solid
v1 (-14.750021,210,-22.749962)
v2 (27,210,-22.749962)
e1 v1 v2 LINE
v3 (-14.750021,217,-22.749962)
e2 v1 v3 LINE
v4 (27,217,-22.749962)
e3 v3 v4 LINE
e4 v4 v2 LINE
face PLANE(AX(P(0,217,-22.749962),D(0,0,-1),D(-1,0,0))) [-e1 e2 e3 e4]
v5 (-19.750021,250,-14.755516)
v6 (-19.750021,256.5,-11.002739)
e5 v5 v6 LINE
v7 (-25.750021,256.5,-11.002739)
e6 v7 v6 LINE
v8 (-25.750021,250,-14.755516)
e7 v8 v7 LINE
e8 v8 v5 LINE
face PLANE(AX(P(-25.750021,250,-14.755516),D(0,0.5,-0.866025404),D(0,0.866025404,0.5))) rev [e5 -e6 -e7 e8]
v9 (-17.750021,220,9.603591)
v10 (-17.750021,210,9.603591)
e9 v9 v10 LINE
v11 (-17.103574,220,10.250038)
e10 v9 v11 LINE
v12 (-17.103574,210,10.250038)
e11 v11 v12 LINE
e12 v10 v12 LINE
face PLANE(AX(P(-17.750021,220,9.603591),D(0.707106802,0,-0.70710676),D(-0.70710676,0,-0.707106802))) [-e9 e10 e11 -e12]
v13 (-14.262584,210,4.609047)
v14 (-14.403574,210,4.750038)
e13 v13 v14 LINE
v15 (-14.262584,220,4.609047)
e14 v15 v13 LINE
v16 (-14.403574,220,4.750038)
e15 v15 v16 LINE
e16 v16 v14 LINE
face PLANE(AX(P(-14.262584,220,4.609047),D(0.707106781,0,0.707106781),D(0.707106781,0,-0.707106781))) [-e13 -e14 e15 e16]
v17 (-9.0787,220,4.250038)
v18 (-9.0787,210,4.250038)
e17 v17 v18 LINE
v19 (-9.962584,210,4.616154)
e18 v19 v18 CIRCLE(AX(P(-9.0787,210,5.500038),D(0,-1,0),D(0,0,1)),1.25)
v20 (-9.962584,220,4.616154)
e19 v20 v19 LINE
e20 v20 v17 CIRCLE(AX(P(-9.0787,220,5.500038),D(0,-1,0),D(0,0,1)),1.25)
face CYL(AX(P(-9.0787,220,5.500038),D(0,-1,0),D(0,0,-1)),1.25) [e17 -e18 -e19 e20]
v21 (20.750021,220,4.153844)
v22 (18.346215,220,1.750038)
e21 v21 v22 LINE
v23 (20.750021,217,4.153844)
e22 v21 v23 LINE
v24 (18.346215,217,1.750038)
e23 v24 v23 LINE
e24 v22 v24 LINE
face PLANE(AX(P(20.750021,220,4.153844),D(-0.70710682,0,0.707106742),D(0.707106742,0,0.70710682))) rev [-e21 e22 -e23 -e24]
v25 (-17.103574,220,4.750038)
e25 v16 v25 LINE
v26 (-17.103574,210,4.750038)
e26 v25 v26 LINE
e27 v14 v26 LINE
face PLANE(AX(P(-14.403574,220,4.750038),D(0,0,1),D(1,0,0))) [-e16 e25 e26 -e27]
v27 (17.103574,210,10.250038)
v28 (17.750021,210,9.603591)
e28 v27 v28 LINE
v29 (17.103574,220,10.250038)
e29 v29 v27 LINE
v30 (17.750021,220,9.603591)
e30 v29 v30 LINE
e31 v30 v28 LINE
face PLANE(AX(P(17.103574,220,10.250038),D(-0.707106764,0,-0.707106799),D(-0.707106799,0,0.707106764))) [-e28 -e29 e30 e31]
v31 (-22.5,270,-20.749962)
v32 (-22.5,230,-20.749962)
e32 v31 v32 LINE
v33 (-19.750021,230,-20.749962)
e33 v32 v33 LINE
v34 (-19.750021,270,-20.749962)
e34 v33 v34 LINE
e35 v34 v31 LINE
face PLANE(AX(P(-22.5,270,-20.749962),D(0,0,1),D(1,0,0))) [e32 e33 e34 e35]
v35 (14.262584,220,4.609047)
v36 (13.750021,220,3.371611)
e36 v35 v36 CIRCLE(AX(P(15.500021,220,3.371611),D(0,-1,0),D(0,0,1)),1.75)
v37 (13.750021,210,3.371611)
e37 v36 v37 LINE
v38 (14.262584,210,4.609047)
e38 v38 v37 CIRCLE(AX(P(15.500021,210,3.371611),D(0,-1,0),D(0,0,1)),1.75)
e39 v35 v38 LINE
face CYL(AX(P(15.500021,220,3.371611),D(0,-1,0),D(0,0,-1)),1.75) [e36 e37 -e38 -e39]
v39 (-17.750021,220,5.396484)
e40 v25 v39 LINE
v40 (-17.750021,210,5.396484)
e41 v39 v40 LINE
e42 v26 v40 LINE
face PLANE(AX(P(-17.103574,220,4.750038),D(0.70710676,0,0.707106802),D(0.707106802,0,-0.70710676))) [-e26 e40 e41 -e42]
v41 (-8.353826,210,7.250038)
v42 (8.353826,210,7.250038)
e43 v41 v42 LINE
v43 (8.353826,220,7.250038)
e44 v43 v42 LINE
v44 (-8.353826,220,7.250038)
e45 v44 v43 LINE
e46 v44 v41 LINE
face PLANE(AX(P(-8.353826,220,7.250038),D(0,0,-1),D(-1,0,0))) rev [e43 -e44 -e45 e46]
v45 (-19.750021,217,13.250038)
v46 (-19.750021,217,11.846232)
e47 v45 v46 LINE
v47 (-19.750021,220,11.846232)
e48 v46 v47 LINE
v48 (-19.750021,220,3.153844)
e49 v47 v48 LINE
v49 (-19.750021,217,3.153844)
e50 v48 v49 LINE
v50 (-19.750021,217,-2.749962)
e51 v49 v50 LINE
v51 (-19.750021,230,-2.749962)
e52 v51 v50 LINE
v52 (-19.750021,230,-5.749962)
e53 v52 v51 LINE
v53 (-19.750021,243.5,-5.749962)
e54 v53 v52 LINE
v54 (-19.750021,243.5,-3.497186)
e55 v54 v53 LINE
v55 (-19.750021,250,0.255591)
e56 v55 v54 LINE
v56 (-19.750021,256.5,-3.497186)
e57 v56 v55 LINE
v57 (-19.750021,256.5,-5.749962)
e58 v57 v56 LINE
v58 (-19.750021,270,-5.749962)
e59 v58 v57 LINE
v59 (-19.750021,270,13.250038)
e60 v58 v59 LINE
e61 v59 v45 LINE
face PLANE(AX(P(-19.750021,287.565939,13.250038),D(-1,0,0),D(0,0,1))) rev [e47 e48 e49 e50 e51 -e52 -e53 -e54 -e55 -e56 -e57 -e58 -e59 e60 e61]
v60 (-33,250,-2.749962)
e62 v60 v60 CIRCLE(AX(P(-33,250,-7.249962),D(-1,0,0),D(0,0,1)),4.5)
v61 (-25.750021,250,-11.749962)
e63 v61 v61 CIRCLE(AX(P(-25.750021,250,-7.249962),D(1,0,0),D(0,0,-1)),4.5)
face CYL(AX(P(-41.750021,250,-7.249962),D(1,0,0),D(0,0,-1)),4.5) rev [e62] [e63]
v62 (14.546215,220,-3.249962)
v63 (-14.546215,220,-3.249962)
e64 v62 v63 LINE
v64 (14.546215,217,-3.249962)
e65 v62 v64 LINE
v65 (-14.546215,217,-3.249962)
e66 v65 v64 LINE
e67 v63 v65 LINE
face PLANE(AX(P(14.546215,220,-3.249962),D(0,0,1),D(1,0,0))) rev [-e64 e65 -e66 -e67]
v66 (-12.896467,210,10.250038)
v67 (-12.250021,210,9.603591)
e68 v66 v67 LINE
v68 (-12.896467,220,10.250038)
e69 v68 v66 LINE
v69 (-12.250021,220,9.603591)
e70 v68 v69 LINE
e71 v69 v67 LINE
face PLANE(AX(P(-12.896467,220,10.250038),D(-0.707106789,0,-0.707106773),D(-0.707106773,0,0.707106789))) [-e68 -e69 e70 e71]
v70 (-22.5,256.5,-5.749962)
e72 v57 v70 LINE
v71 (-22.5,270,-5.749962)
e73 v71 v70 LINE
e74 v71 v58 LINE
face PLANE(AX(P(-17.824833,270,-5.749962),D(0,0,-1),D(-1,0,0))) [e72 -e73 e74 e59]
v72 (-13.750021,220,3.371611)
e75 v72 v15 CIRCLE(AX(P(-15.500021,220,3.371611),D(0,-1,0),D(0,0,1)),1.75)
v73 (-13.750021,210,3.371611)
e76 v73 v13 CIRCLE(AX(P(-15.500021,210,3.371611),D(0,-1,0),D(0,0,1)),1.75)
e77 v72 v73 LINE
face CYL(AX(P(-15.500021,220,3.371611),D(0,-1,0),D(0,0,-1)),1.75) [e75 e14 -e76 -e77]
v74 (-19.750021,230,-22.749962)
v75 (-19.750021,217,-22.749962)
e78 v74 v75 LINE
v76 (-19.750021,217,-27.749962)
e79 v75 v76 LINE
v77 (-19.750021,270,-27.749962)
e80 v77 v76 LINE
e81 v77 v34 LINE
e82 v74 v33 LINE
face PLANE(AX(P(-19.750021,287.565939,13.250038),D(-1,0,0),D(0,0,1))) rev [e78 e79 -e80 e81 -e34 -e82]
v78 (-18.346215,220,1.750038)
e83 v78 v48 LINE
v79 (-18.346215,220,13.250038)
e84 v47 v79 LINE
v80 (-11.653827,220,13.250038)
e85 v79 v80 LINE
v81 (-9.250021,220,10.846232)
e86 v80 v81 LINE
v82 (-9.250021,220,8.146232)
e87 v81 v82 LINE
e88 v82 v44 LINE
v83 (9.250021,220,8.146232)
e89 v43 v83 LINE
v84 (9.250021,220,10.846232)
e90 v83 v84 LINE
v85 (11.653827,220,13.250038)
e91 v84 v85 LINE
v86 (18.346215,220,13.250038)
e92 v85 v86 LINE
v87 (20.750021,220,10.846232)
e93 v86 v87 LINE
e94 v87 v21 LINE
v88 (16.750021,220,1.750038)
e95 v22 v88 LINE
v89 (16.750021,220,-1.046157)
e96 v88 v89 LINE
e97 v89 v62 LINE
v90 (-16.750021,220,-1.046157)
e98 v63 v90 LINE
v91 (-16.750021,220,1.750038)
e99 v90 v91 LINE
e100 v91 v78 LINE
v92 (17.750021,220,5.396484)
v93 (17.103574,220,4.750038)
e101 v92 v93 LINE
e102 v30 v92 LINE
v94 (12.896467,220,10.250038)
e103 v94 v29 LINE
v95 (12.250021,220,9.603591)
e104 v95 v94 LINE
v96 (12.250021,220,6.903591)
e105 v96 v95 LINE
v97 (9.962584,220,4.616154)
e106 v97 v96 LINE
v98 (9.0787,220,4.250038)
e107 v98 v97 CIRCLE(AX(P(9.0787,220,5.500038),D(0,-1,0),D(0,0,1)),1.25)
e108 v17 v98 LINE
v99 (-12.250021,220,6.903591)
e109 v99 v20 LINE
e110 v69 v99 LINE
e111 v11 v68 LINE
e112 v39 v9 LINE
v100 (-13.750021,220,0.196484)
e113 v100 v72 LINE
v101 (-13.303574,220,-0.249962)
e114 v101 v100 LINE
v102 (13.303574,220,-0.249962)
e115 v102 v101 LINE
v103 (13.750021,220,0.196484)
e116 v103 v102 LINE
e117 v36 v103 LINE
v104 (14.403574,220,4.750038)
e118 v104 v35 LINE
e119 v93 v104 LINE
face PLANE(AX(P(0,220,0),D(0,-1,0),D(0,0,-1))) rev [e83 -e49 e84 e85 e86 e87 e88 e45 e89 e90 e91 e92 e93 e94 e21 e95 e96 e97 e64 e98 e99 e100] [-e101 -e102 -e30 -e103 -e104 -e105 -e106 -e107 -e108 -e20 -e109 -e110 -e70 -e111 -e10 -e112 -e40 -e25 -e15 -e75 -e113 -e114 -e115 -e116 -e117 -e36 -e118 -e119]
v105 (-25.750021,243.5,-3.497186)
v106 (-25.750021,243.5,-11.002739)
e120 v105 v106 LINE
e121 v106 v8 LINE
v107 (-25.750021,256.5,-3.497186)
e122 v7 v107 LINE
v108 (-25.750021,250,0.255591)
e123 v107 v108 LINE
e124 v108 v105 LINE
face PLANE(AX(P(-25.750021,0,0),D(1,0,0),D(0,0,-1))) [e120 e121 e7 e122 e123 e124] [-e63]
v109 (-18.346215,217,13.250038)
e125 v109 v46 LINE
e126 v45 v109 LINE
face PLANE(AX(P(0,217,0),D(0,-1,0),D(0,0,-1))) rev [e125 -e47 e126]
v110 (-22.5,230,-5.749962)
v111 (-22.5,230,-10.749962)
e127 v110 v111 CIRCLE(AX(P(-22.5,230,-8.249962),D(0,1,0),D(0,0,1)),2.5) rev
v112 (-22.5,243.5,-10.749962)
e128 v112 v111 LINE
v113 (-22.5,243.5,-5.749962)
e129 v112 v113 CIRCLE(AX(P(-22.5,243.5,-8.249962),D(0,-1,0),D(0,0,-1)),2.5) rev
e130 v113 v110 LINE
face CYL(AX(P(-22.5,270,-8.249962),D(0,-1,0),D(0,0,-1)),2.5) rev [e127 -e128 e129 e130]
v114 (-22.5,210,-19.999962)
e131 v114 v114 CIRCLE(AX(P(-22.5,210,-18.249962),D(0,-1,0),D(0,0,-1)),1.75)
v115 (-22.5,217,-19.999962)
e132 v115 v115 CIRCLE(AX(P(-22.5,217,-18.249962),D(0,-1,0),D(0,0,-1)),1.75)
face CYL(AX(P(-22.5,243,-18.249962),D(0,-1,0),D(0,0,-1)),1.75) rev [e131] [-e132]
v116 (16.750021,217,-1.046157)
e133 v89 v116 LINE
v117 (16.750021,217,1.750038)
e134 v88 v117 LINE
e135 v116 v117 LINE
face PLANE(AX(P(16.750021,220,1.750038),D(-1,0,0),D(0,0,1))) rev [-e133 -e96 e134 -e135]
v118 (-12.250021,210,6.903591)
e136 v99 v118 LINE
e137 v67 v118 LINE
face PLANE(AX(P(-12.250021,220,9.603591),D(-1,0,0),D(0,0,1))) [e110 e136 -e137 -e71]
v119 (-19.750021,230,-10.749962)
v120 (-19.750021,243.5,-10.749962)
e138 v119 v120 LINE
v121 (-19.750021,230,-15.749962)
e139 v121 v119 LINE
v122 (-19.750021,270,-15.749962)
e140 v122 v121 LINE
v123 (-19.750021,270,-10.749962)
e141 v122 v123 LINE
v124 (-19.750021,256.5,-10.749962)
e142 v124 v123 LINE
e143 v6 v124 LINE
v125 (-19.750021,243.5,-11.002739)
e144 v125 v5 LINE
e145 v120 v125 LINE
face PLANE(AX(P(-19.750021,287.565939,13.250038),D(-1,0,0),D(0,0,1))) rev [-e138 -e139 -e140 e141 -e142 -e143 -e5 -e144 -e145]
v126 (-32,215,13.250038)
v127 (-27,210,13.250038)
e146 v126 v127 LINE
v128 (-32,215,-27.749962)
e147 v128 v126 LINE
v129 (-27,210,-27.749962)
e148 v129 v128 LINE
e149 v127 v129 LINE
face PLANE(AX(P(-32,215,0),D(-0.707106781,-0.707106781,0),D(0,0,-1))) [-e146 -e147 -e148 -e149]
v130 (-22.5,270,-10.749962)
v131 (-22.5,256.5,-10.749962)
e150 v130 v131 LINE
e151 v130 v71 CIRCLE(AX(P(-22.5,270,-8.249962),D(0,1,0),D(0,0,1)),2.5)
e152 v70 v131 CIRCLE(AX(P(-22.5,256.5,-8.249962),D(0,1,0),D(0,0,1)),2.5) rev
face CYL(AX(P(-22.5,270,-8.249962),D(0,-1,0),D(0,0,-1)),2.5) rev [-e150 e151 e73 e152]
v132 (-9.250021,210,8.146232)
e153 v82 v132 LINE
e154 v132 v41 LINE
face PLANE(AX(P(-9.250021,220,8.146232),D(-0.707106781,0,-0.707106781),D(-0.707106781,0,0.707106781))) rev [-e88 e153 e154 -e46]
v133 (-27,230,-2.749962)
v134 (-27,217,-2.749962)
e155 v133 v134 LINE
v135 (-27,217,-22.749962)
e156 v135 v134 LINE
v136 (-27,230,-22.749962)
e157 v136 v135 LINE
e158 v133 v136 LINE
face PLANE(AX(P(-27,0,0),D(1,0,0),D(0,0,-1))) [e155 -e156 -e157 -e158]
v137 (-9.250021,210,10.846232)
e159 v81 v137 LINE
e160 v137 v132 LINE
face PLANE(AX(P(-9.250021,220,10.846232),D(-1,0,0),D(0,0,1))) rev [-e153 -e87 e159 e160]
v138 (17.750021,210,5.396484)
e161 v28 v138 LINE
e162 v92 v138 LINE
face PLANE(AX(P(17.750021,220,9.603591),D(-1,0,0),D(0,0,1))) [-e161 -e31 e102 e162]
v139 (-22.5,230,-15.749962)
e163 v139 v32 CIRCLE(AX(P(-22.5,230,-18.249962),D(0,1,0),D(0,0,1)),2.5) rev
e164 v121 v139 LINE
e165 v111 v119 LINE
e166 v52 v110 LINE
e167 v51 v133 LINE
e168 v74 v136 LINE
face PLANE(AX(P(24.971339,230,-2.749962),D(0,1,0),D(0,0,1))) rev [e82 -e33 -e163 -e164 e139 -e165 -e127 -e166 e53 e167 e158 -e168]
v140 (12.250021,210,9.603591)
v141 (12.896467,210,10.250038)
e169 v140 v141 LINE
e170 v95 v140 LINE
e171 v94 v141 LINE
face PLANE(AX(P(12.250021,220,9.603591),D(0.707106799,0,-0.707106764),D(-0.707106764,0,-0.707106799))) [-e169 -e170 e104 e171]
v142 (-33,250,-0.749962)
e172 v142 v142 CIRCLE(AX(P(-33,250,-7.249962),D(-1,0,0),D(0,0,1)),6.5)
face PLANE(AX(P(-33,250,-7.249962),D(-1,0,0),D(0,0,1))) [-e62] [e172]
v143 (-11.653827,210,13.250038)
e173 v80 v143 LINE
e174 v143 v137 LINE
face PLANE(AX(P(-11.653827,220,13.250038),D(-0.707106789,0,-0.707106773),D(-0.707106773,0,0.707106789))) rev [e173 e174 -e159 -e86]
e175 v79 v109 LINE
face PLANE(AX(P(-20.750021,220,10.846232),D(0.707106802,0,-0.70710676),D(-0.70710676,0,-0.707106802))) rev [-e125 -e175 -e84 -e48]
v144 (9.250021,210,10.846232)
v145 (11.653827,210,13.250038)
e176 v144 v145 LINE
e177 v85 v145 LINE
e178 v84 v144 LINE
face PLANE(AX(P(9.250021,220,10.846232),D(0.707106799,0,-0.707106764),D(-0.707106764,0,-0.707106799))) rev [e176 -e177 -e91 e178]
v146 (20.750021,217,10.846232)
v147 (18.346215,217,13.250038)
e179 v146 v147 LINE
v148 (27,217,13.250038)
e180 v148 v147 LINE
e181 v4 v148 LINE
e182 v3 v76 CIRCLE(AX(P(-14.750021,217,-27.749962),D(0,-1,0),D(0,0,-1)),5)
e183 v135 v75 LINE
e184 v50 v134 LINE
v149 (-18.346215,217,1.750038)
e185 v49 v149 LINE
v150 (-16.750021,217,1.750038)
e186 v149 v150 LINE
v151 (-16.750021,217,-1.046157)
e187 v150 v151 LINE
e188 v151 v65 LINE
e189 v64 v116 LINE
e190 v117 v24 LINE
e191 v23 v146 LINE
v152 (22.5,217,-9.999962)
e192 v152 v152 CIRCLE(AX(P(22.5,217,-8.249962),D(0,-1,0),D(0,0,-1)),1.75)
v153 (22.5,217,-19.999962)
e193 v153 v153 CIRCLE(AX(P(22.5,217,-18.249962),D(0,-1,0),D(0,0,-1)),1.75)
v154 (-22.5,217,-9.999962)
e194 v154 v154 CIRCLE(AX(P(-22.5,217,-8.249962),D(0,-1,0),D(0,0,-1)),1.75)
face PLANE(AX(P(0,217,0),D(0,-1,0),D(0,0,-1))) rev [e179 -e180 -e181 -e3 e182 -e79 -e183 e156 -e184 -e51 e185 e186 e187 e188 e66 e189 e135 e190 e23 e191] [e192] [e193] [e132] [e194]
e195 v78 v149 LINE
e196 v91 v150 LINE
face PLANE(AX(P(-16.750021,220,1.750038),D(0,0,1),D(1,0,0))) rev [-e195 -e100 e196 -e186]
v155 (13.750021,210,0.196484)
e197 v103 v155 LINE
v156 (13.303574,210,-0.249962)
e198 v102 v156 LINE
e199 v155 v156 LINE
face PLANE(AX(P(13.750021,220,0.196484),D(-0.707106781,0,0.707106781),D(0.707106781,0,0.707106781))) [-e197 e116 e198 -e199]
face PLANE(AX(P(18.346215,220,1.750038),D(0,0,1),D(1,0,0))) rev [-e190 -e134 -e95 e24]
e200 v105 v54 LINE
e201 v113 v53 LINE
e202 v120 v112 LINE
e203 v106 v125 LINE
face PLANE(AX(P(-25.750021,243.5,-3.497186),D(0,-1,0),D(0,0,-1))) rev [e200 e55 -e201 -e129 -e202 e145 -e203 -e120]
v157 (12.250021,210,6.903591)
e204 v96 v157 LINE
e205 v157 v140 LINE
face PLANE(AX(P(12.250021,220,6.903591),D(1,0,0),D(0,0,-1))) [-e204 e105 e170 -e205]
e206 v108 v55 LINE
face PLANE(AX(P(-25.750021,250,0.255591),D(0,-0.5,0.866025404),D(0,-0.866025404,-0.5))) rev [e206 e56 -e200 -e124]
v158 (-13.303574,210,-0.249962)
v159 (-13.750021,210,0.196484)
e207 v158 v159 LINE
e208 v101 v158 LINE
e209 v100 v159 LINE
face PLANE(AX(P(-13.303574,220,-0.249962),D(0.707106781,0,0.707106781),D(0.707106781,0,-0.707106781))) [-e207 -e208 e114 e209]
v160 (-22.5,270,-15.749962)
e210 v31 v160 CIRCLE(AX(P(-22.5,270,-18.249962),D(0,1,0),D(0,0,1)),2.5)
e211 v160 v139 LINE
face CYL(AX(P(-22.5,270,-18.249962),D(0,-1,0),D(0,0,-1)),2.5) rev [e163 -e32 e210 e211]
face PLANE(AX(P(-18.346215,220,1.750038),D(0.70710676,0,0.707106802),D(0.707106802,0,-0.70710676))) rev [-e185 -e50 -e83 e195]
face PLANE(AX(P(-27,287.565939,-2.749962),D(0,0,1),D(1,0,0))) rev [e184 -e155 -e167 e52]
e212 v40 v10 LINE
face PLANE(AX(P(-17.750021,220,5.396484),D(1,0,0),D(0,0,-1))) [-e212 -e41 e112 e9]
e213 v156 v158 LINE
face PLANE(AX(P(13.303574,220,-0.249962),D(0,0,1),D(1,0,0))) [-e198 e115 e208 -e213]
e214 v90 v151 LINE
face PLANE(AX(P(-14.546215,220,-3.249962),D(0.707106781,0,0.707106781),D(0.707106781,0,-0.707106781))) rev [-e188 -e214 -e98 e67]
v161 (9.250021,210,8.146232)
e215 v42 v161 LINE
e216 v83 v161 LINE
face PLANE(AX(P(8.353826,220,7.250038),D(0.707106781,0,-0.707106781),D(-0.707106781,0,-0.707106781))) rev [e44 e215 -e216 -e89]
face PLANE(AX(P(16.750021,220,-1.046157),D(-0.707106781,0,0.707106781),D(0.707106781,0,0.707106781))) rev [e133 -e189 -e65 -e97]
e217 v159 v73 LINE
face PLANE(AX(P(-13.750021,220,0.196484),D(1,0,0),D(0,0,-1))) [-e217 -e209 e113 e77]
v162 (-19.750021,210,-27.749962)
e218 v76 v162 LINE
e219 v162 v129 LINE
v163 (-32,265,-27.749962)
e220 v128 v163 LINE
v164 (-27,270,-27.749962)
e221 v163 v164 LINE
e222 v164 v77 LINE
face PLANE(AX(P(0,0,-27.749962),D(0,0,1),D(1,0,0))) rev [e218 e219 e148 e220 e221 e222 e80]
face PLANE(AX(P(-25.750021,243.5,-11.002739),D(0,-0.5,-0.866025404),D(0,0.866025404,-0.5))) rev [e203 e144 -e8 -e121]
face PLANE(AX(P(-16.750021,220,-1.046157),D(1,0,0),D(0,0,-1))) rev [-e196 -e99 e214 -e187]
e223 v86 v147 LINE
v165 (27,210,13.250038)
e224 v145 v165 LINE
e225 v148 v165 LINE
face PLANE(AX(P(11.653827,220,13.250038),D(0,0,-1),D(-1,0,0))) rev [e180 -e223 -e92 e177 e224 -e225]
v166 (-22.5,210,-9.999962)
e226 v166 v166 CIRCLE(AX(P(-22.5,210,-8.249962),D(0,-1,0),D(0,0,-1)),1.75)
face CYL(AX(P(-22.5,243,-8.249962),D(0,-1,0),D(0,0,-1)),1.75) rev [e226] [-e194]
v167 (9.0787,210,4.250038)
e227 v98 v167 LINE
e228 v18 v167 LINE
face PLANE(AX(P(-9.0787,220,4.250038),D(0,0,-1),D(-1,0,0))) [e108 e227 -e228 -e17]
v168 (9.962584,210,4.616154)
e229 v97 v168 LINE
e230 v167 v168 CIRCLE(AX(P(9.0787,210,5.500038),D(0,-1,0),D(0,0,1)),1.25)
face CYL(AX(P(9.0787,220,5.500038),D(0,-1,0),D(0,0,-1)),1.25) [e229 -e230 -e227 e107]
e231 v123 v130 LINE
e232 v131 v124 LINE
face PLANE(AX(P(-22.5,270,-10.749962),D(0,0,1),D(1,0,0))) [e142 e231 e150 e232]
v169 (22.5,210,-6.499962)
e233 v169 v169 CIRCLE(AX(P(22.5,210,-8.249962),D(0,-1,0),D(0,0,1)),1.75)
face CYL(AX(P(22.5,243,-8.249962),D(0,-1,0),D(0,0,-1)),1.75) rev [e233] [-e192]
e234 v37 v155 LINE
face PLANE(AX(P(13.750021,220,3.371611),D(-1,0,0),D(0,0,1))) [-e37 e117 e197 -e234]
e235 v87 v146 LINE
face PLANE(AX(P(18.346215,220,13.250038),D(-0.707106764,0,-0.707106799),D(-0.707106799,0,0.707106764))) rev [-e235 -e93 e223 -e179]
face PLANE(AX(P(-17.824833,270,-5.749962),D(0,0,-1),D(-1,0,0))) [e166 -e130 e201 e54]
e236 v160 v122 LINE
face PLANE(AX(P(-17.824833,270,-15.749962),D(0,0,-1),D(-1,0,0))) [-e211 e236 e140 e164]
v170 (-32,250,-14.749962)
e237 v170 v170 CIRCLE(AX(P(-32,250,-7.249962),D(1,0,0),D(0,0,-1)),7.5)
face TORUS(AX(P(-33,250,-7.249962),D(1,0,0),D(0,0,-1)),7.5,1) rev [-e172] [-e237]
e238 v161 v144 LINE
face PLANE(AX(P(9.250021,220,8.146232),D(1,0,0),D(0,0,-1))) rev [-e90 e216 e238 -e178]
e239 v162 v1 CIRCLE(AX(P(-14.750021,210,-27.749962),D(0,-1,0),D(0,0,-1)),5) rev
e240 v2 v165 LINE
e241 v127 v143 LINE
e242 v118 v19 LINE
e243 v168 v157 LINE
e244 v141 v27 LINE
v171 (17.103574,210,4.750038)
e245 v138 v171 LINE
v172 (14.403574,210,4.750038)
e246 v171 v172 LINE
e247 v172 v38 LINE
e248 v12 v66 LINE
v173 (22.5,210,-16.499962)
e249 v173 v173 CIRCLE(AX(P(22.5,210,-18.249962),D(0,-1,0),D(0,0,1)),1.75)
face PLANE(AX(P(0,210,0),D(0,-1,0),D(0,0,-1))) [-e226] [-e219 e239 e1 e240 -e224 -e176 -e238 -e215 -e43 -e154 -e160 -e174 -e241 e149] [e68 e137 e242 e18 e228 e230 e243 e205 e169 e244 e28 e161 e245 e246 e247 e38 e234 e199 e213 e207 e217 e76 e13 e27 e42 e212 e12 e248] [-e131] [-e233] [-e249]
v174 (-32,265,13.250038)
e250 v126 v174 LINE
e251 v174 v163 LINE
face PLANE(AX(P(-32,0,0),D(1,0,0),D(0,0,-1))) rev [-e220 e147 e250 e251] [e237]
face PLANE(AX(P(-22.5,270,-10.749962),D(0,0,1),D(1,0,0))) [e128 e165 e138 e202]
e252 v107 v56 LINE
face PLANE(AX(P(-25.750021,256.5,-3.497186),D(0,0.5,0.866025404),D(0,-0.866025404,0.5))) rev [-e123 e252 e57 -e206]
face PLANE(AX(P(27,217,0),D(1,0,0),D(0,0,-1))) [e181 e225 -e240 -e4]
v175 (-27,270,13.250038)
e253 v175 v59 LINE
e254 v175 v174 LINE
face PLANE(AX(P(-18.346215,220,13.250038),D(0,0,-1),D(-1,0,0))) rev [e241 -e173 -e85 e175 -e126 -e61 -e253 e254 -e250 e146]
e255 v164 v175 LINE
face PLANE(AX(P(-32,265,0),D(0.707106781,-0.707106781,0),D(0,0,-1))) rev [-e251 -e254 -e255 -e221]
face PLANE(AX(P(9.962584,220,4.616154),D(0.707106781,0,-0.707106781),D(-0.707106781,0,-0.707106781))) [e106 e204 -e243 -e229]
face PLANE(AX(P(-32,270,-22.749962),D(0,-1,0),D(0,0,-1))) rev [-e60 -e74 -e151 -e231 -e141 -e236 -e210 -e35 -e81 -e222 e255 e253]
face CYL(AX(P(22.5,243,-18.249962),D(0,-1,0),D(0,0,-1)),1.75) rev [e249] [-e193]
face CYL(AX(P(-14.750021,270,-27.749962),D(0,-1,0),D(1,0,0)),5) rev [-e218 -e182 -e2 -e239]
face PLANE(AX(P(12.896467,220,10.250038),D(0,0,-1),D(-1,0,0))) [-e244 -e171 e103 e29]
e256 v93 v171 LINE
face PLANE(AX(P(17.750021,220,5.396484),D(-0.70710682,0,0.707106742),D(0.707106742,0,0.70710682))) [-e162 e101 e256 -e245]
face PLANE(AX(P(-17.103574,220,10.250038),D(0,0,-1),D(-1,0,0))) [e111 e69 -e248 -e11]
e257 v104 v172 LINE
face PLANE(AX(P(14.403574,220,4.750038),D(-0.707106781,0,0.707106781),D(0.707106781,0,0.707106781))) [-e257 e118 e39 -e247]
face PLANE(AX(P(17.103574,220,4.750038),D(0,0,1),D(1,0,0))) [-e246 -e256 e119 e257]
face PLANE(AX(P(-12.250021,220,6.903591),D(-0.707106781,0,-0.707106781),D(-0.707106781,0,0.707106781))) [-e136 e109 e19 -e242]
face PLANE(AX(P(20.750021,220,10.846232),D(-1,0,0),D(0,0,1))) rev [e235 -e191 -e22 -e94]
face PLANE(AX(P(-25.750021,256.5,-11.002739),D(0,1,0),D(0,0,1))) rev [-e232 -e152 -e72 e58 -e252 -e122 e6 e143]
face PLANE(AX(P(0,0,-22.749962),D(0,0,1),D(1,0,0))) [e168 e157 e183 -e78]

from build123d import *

# Parameters (mm, degrees)
BOSS_EXTRUDE1_DEPTH = 400
BOSS_EXTRUDE2_DEPTH = 10
SKETCH3_R           = 43.000999871
CUT_EXTRUDE1_DEPTH  = 447.360216168
BOSS_EXTRUDE3_DEPTH = 7
SKETCH5_R           = 1.75
CUT_EXTRUDE2_DEPTH  = 33
SKETCH6_W           = 36.000000185
SKETCH6_H           = 60
BOSS_EXTRUDE4_DEPTH = 5
SKETCH7_W           = 7.24997928
SKETCH7_H           = 16
BOSS_EXTRUDE5_DEPTH = 53
SKETCH8_W           = 12.24997928
SKETCH8_H           = 60
BOSS_EXTRUDE6_DEPTH = 5
FILLET1_R           = 5
SKETCH10_W          = 20.000000185
SKETCH10_H          = 40
BOSS_EXTRUDE7_DEPTH = 7.24997928
CUT_EXTRUDE3_DEPTH  = 6
CUT_EXTRUDE4_DEPTH  = 68.845857758
SKETCH12_R          = 4.5
CUT_EXTRUDE5_DEPTH  = 16
CHAMFER2_SIZE       = 5
CHAMFER3_SIZE       = 5
SKETCH13_R          = 6.5
SKETCH13_R_2        = 4.5
BOSS_EXTRUDE8_DEPTH = 1
FILLET2_R           = 1


with BuildPart() as part:
    # Sketch1 → Boss-Extrude1 (new body)
    with BuildSketch(Plane(origin=(0, 200, 0), x_dir=(1, 0, 0), z_dir=(0, 1, 0))):
        with BuildLine():
            Line((1e-09, -3.855700002), (0.25, -4.00003757))
            Line((0.25, -4.00003757), (9.078700232, -4.00003757))
            ThreePointArc((9.078700232, -4.00003757), (9.652725366, -4.114218268), (10.139360377, -4.439377387))
            Line((10.139360377, -4.439377387), (12.500020747, -6.800037757))
            Line((12.500020747, -6.800037757), (12.500020747, -9.500037757))
            Line((12.500020747, -9.500037757), (13.00002072, -10.000037755))
            Line((13.00002072, -10.000037755), (17.00002072, -10.000037755))
            Line((17.00002072, -10.000037755), (17.500020747, -9.500037752))
            Line((17.500020747, -9.500037752), (17.500020747, -5.500037752))
            Line((17.500020747, -5.500037752), (17.00002075, -5.0000377))
            Line((17.00002075, -5.0000377), (14.30002072, -5.0000377))
            Line((14.30002072, -5.0000377), (14.085807141, -4.785824121))
            ThreePointArc((14.085807141, -4.785824121), (13.652261651, -4.136977442), (13.50002072, -3.371610598))
            Line((13.50002072, -3.371610598), (13.50002072, -0.30003757))
            Line((13.50002072, -0.30003757), (13.20002072, -3.757e-05))
            Line((13.20002072, -3.757e-05), (7.50002072, -3.757e-05))
            Line((7.50002072, -3.757e-05), (7.40002072, -0.10003757))
            Line((7.40002072, -0.10003757), (-7.40002072, -0.10003757))
            Line((-7.40002072, -0.10003757), (-7.50002072, -3.757e-05))
            Line((-7.50002072, -3.757e-05), (-13.20002072, -3.757e-05))
            Line((-13.20002072, -3.757e-05), (-13.50002072, -0.30003757))
            Line((-13.50002072, -0.30003757), (-13.50002072, -3.371610628))
            ThreePointArc((-13.50002072, -3.371610628), (-13.652261651, -4.136977472), (-14.085807141, -4.785824151))
            Line((-14.085807141, -4.785824151), (-14.30002069, -5.0000377))
            Line((-14.30002069, -5.0000377), (-17.00002072, -5.0000377))
            Line((-17.00002072, -5.0000377), (-17.50002072, -5.50003767))
            Line((-17.50002072, -5.50003767), (-17.50002072, -9.50003767))
            Line((-17.50002072, -9.50003767), (-17.000020665, -10.000037755))
            Line((-17.000020665, -10.000037755), (-13.00002072, -10.000037755))
            Line((-13.00002072, -10.000037755), (-12.500020741, -9.500037764))
            Line((-12.500020741, -9.500037764), (-12.500020741, -6.800037764))
            Line((-12.500020741, -6.800037764), (-10.139360364, -4.439377387))
            ThreePointArc((-10.139360364, -4.439377387), (-9.652725352, -4.114218268), (-9.078700218, -4.00003757))
            Line((-9.078700218, -4.00003757), (-0.25, -4.00003757))
            Line((-0.25, -4.00003757), (1e-09, -3.855700002))
        make_face()
    extrude(amount=-BOSS_EXTRUDE1_DEPTH)

    # Sketch3 → Cut-Extrude1 (cut)
    with BuildSketch(Plane(origin=(0, 200, 0), x_dir=(1, 0, 0), z_dir=(0, 1, 0))):
        with Locations((0, -0.10003757)):
            Circle(SKETCH3_R)
    extrude(amount=-CUT_EXTRUDE1_DEPTH, mode=Mode.SUBTRACT)


with BuildPart() as body_2:
    # Sketch2 → Boss-Extrude2 (new body)
    with BuildSketch(Plane(origin=(0, 210, 0), x_dir=(1, 0, 0), z_dir=(0, 1, 0))):
        Polygon((-8.353826469, -7.25003757), (8.353826482, -7.25003757), (9.250020747, -8.146231835), (9.250020747, -10.846231788), (11.653826595, -13.250037755), (18.34621475, -13.250037755), (20.750020747, -10.846231878), (20.750020747, -4.153843779), (18.346214932, -1.7500377), (16.75002072, -1.7500377), (16.75002072, 1.046156508), (14.546214798, 3.24996243), (-14.546214798, 3.24996243), (-16.75002072, 1.046156508), (-16.75002072, -1.7500377), (-18.346214741, -1.7500377), (-20.75002072, -4.153843535), (-20.75002072, -10.846231691), (-18.3462148, -13.250037755), (-11.653826621, -13.250037755), (-9.250020741, -10.846231821), (-9.250020741, -8.146231842), align=None)
        with BuildLine():
            Line((13.303574111, 0.24996243), (-13.303574111, 0.24996243))
            Line((-13.303574111, 0.24996243), (-13.75002072, -0.196484179))
            Line((-13.75002072, -0.196484179), (-13.75002072, -3.371610628))
            ThreePointArc((-13.75002072, -3.371610628), (-13.883231534, -4.041306614), (-14.262583837, -4.609047456))
            Line((-14.262583837, -4.609047456), (-14.403574081, -4.7500377))
            Line((-14.403574081, -4.7500377), (-17.103574106, -4.7500377))
            Line((-17.103574106, -4.7500377), (-17.75002072, -5.396484275))
            Line((-17.75002072, -5.396484275), (-17.75002072, -9.603591056))
            Line((-17.75002072, -9.603591056), (-17.10357406, -10.250037755))
            Line((-17.10357406, -10.250037755), (-12.896467328, -10.250037755))
            Line((-12.896467328, -10.250037755), (-12.250020741, -9.603591153))
            Line((-12.250020741, -9.603591153), (-12.250020741, -6.903591155))
            Line((-12.250020741, -6.903591155), (-9.962583668, -4.616154083))
            ThreePointArc((-9.962583668, -4.616154083), (-9.557054494, -4.345188152), (-9.078700218, -4.25003757))
            Line((-9.078700218, -4.25003757), (9.078700232, -4.25003757))
            ThreePointArc((9.078700232, -4.25003757), (9.557054508, -4.345188152), (9.962583682, -4.616154083))
            Line((9.962583682, -4.616154083), (12.250020747, -6.903591148))
            Line((12.250020747, -6.903591148), (12.250020747, -9.603591144))
            Line((12.250020747, -9.603591144), (12.896467326, -10.250037755))
            Line((12.896467326, -10.250037755), (17.103574107, -10.250037755))
            Line((17.103574107, -10.250037755), (17.750020747, -9.603591147))
            Line((17.750020747, -9.603591147), (17.750020747, -5.39648437))
            Line((17.750020747, -5.39648437), (17.103574149, -4.7500377))
            Line((17.103574149, -4.7500377), (14.403574111, -4.7500377))
            Line((14.403574111, -4.7500377), (14.262583837, -4.609047426))
            ThreePointArc((14.262583837, -4.609047426), (13.883231534, -4.041306584), (13.75002072, -3.371610598))
            Line((13.75002072, -3.371610598), (13.75002072, -0.196484179))
            Line((13.75002072, -0.196484179), (13.303574111, 0.24996243))
        make_face(mode=Mode.SUBTRACT)
    extrude(amount=BOSS_EXTRUDE2_DEPTH)

    # Sketch4 → Boss-Extrude3 (add)
    with BuildSketch(Plane(origin=(0, 210, 0), x_dir=(-1, 0, 0), z_dir=(0, -1, 0))):
        Polygon((27, -13.250037755), (27, 22.74996243), (-27, 22.74996243), (-27, -13.250037755), (-18.34621475, -13.250037755), (-20.750020747, -10.846231878), (-20.750020747, -4.153843779), (-18.346214932, -1.7500377), (-16.75002072, -1.7500377), (-16.75002072, 1.046156508), (-14.546214798, 3.24996243), (14.546214798, 3.24996243), (16.75002072, 1.046156508), (16.75002072, -1.7500377), (18.346214741, -1.7500377), (20.75002072, -4.153843535), (20.75002072, -10.846231691), (18.3462148, -13.250037755), align=None)
    extrude(amount=-BOSS_EXTRUDE3_DEPTH)

    # Sketch5 → Cut-Extrude2 (cut)
    with BuildSketch(Plane(origin=(0, 210, 0), x_dir=(-1, 0, 0), z_dir=(0, -1, 0))):
        with Locations(Location((22.5, 18.24996243, 0), (0, 0, 90))):
            Circle(SKETCH5_R)
        with Locations(Location((22.5, 8.24996243, 0), (0, 0, 90))):
            Circle(SKETCH5_R)
        with Locations(Location((-22.5, 8.24996243, 0), (0, 0, 90))):
            Circle(SKETCH5_R)
        with Locations(Location((-22.5, 18.24996243, 0), (0, 0, 90))):
            Circle(SKETCH5_R)
    extrude(amount=-CUT_EXTRUDE2_DEPTH, mode=Mode.SUBTRACT)

    # Sketch6 → Boss-Extrude4 (add)
    with BuildSketch(Plane.ZY.offset(27)):
        with Locations((-4.749962337, 240)):
            Rectangle(SKETCH6_W, SKETCH6_H)
    extrude(amount=BOSS_EXTRUDE4_DEPTH)

    # Sketch7 → Boss-Extrude5 (add)
    with BuildSketch(Plane(origin=(0, 217, 0), x_dir=(1, 0, 0), z_dir=(0, 1, 0))):
        with Locations((-23.37501036, -5.250037755)):
            Rectangle(SKETCH7_W, SKETCH7_H)
    extrude(amount=BOSS_EXTRUDE5_DEPTH)

    # Sketch8 → Boss-Extrude6 (add)
    with BuildSketch(Plane(origin=(0, 0, -22.74996243), x_dir=(-1, 0, 0), z_dir=(0, 0, -1))):
        with Locations((25.87501036, 240)):
            Rectangle(SKETCH8_W, SKETCH8_H)
    extrude(amount=BOSS_EXTRUDE6_DEPTH)

    # Fillet1
    fillet1_edges = [body_2.edges().sort_by_distance(p)[0] for p in [
        (-19.75002072, 213.5, -22.74996243),
    ]]
    fillet(fillet1_edges, radius=FILLET1_R - 0.0001)  # a hair under: the kernel refuses the full size

    # Sketch10 → Boss-Extrude7 (add)
    with BuildSketch(Plane(origin=(-27, 0, 0), x_dir=(0, 0, -1), z_dir=(1, 0, 0))):
        with Locations((12.749962337, 250)):
            Rectangle(SKETCH10_W, SKETCH10_H)
    extrude(amount=BOSS_EXTRUDE7_DEPTH)

    # Sketch9 → Cut-Extrude3 (cut)
    with BuildSketch(Plane(origin=(-19.75002072, 0, 0), x_dir=(0, 0, -1), z_dir=(1, 0, 0))):
        Polygon((14.755515837, 250), (11.002739087, 256.5), (3.497185588, 256.5), (-0.255591162, 250), (3.497185588, 243.5), (11.002739087, 243.5), align=None)
    extrude(amount=-CUT_EXTRUDE3_DEPTH, mode=Mode.SUBTRACT)

    # Sketch11 → Cut-Extrude4 (cut, through all)
    with BuildSketch(Plane(origin=(0, 217, 0), x_dir=(1, 0, 0), z_dir=(0, 1, 0))):
        with BuildLine():
            Line((-22.5, 20.74996243), (-17.824832595, 20.74996243))
            Line((-17.824832595, 20.74996243), (-17.824832595, 15.74996243))
            Line((-17.824832595, 15.74996243), (-22.5, 15.74996243))
            ThreePointArc((-22.5, 15.74996243), (-25, 18.24996243), (-22.5, 20.74996243))
        make_face()
        with BuildLine():
            Line((-22.5, 10.74996243), (-17.824832595, 10.74996243))
            Line((-17.824832595, 10.74996243), (-17.824832595, 5.74996243))
            Line((-17.824832595, 5.74996243), (-22.5, 5.74996243))
            ThreePointArc((-22.5, 5.74996243), (-25, 8.24996243), (-22.5, 10.74996243))
        make_face()
    extrude(amount=CUT_EXTRUDE4_DEPTH, mode=Mode.SUBTRACT)

    # Sketch12 → Cut-Extrude5 (cut)
    with BuildSketch(Plane(origin=(-25.75002072, 0, 0), x_dir=(0, 0, -1), z_dir=(1, 0, 0))):
        with Locations((7.249962338, 250)):
            Circle(SKETCH12_R)
    extrude(amount=-CUT_EXTRUDE5_DEPTH, mode=Mode.SUBTRACT)

    # Chamfer2
    chamfer2_edges = [body_2.edges().sort_by_distance(p)[0] for p in [
        (-32, 270, -7.249962337),
    ]]
    chamfer(chamfer2_edges, length=CHAMFER2_SIZE)

    # Chamfer3
    chamfer3_edges = [body_2.edges().sort_by_distance(p)[0] for p in [
        (-32, 210, -7.249962338),
    ]]
    chamfer(chamfer3_edges, length=CHAMFER3_SIZE)

    # Sketch13 → Boss-Extrude8 (add)
    with BuildSketch(Plane.ZY.offset(32)):
        with Locations(Location((-7.249962338, 250, 0), (0, 0, 180))):
            Circle(SKETCH13_R)
        with Locations(Location((-7.249962338, 250, 0), (0, 0, 180))):
            Circle(SKETCH13_R_2, mode=Mode.SUBTRACT)
    extrude(amount=BOSS_EXTRUDE8_DEPTH)

    # Fillet2
    fillet2_edges = [body_2.edges().sort_by_distance(p)[0] for p in [
        (-32, 250, -0.749962338),
    ]]
    fillet(fillet2_edges, radius=FILLET2_R - 0.0001)  # a hair under: the kernel refuses the full size


solid = body_2.part
